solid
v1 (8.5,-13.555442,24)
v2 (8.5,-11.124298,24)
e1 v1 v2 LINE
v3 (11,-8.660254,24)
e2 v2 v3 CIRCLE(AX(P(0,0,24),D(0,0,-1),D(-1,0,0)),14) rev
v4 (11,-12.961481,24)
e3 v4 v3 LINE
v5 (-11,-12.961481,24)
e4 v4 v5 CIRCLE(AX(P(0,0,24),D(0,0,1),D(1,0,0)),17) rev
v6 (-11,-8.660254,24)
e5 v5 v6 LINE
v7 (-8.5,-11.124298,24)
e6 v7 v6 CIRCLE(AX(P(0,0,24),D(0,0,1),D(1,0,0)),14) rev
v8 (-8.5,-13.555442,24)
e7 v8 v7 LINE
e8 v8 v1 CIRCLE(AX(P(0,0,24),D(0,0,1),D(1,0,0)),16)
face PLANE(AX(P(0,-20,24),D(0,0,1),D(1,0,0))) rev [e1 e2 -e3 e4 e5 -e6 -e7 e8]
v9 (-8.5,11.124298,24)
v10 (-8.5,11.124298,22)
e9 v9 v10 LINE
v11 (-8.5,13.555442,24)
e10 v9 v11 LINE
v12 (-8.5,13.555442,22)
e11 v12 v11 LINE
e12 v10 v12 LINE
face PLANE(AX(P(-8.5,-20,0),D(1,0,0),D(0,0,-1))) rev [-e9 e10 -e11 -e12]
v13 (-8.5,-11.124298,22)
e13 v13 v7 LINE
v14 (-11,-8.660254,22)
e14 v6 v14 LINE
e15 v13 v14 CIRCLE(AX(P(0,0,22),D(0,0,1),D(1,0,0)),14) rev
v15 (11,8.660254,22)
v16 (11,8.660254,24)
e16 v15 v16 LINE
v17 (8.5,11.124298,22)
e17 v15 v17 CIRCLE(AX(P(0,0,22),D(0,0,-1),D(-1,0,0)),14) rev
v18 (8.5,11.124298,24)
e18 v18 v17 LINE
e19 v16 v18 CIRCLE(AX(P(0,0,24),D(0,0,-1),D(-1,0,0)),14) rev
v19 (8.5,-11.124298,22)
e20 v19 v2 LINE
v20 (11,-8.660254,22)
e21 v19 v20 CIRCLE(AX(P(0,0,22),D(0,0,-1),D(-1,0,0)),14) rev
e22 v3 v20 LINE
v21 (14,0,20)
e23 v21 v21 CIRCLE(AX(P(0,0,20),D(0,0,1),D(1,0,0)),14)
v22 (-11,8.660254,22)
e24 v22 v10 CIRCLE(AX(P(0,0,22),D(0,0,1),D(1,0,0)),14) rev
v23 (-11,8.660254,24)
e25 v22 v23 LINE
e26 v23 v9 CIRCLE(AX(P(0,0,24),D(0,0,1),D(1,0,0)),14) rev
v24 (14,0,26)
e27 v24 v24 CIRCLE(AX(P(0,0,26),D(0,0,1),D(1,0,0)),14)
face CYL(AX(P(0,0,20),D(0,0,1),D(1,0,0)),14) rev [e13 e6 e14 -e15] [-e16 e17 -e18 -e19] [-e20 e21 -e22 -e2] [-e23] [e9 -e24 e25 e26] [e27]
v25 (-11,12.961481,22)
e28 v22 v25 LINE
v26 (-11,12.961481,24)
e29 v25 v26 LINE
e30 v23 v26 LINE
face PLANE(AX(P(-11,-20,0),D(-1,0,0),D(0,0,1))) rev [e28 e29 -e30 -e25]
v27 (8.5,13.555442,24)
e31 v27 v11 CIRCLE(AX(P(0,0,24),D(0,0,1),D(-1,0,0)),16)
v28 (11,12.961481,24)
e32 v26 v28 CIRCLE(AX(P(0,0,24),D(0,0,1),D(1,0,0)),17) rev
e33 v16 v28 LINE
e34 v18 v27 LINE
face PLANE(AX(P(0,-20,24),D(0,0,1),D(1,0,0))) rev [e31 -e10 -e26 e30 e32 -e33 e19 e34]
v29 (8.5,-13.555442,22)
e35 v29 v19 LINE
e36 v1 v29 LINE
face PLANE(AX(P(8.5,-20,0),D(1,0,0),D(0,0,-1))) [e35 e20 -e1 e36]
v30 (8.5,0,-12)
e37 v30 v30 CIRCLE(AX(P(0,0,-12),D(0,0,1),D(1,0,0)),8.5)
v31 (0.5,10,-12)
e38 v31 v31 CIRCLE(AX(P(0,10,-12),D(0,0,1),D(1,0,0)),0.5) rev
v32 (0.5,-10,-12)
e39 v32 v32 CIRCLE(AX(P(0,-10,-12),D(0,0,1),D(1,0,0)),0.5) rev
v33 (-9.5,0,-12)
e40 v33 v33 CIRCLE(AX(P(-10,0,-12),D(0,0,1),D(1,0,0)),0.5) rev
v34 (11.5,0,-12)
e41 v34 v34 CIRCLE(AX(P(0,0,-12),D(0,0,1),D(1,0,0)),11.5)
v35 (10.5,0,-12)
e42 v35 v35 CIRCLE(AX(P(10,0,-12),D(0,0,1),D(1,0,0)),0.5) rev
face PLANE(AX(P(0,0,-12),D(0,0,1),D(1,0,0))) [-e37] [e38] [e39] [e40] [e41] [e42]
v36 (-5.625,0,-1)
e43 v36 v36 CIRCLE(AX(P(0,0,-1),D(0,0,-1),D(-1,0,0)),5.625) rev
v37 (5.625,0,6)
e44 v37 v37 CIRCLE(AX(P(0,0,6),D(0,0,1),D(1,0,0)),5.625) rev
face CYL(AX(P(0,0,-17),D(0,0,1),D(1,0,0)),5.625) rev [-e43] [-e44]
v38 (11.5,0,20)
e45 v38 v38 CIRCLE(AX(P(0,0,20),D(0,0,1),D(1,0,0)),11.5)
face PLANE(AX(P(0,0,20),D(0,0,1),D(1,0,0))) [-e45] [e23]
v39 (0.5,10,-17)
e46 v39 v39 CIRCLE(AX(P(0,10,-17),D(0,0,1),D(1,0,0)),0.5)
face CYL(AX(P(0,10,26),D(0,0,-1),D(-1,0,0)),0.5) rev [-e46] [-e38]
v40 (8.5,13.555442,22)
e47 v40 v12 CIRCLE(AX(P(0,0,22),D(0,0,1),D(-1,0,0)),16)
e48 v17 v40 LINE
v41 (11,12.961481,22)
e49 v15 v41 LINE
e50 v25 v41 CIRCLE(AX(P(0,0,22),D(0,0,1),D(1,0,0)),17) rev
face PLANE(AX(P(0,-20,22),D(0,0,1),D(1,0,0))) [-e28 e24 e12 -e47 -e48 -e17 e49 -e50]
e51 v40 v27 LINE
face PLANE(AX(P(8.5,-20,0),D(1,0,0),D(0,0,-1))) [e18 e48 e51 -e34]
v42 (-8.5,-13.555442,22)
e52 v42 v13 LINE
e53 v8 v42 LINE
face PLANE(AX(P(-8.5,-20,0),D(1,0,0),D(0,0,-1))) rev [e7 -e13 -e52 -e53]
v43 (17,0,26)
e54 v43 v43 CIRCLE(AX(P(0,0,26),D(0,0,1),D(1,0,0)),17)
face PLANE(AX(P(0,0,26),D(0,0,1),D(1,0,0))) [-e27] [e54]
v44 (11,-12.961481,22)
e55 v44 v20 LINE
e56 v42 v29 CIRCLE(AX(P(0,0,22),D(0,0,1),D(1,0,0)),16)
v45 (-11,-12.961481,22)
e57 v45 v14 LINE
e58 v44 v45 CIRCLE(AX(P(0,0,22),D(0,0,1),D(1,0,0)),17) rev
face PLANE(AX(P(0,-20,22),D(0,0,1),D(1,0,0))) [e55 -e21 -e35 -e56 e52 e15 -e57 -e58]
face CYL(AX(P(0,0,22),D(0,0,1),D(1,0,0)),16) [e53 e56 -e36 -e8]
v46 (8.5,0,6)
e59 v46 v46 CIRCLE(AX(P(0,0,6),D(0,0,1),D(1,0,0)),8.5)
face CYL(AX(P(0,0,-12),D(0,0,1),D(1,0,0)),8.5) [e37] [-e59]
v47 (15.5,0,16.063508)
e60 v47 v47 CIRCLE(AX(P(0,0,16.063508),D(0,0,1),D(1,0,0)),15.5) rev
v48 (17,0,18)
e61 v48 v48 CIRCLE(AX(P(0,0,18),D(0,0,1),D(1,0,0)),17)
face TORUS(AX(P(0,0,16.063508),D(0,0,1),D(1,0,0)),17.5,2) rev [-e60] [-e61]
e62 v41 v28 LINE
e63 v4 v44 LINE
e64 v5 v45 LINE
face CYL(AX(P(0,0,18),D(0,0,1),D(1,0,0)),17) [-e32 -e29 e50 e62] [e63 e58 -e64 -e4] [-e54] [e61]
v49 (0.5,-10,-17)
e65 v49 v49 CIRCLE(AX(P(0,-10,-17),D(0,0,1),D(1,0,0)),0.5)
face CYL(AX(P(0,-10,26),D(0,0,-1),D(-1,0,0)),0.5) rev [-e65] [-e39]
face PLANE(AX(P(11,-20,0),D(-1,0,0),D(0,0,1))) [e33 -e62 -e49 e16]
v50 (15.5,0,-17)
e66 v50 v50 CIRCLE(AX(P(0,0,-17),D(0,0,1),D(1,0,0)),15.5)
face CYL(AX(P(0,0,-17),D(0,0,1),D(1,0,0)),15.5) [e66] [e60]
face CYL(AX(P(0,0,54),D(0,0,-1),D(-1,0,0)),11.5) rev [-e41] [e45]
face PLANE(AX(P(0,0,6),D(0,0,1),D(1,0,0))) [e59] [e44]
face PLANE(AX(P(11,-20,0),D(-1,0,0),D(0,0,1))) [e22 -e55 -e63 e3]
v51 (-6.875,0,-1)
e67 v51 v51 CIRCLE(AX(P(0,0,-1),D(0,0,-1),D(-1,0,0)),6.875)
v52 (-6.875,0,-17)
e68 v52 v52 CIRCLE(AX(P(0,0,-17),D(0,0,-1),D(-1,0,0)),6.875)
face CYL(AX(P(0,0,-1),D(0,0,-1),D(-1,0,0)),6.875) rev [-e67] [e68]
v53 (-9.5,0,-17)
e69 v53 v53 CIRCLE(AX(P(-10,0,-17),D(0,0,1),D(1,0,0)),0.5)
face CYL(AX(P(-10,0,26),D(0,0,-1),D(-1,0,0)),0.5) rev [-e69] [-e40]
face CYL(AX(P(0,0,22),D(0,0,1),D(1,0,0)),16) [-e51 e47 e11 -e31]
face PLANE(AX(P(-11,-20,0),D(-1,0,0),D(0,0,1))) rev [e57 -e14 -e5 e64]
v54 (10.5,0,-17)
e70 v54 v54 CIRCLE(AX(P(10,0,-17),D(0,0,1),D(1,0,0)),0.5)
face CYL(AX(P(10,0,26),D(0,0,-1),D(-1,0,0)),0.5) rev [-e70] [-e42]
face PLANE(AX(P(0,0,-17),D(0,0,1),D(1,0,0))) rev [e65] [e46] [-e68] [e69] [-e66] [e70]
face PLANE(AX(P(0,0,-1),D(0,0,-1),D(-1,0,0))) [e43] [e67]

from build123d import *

# Parameters (mm, degrees)
BOSS_EXTRUDE5_DEPTH      = 26
BOSS_EXTRUDE5_DEPTH_BACK = 17
SKETCH1_R                = 15.5
SKETCH3_R                = 5.625
CUT_EXTRUDE2_DEPTH       = 49.264894074
CUT_EXTRUDE3_DEPTH       = 28
CUT_EXTRUDE3_DEPTH_BACK  = 20
SKETCH4_R                = 11.5
CUT_EXTRUDE6_START       = 6
SKETCH7_R                = 11.5
SKETCH7_R_2              = 8.5
CUT_EXTRUDE6_DEPTH       = 18
BOSS_EXTRUDE8_DEPTH      = 6
BOSS_EXTRUDE8_DEPTH_BACK = 2
BOSS_EXTRUDE8_START      = 20
SKETCH12_R               = 17
CUT_EXTRUDE10_START      = 18
SKETCH13_R               = 11.5
CUT_EXTRUDE10_DEPTH      = 18.411862419
FILLET2_R                = 2
CUT_EXTRUDE11_START      = 26
SKETCH14_R               = 14
CUT_EXTRUDE11_DEPTH      = 6
CUT_EXTRUDE14_DEPTH      = 36.411862419
CUT_EXTRUDE14_DEPTH_BACK = 36.411862419
SKETCH15_R               = 0.5
SKETCH18_W               = 2.5
SKETCH18_H               = 2
CUT_EXTRUDE15_DEPTH      = 20
CUT_EXTRUDE16_DEPTH      = 2
SKETCH28_R               = 6.875
CUT_EXTRUDE17_DEPTH      = 16


with BuildPart() as part:
    # Sketch1 → Boss-Extrude5 (new, two sides: drawn at the far end of the back side and taken through both)
    with BuildSketch(Plane.XY.offset(-BOSS_EXTRUDE5_DEPTH_BACK)):
        Circle(SKETCH1_R)
    extrude(amount=BOSS_EXTRUDE5_DEPTH + BOSS_EXTRUDE5_DEPTH_BACK)

    # Sketch3 → Cut-Extrude2 (cut, through all)
    with BuildSketch(Plane.XY.offset(26)):
        Circle(SKETCH3_R)
    extrude(amount=-CUT_EXTRUDE2_DEPTH, mode=Mode.SUBTRACT)

    # Sketch4 → Cut-Extrude3 (cut, two sides: drawn at the far end of the back side and taken through both)
    with BuildSketch(Plane.XY.offset(26).offset(-CUT_EXTRUDE3_DEPTH_BACK)):
        Circle(SKETCH4_R)
    extrude(amount=CUT_EXTRUDE3_DEPTH + CUT_EXTRUDE3_DEPTH_BACK, mode=Mode.SUBTRACT)

    # Sketch7 → Cut-Extrude6 (cut)
    with BuildSketch(Plane.XY.offset(CUT_EXTRUDE6_START)):
        Circle(SKETCH7_R)
        Circle(SKETCH7_R_2, mode=Mode.SUBTRACT)
    extrude(amount=-CUT_EXTRUDE6_DEPTH, mode=Mode.SUBTRACT)

    # Sketch12 → Boss-Extrude8 (add, two sides: drawn at the far end of the back side and taken through both)
    with BuildSketch(Plane.XY.offset(BOSS_EXTRUDE8_START - BOSS_EXTRUDE8_DEPTH_BACK)):
        Circle(SKETCH12_R)
    extrude(amount=BOSS_EXTRUDE8_DEPTH + BOSS_EXTRUDE8_DEPTH_BACK)

    # Sketch13 → Cut-Extrude10 (cut, through all)
    with BuildSketch(Plane.XY.offset(CUT_EXTRUDE10_START)):
        Circle(SKETCH13_R)
    extrude(amount=CUT_EXTRUDE10_DEPTH, mode=Mode.SUBTRACT)

    # Fillet2
    # the kernel refuses this fillet: 2 mm, written as the material it adds along each edge
    with BuildSketch(Plane(origin=(0, 0, 18), x_dir=(1, 0, 0), z_dir=(0, 1, 0))) as fillet2_piece_1:
        with BuildLine():
            CenterArc((17.5, 1.936491673), FILLET2_R, 180, 75.522487814)
            Line((17, 0), (16.99, -0.038729833))
            ThreePointArc((16.99, -0.038729833), (16.25, -0.04), (15.5, -0.04))
            Line((15.5, -0.04), (15.46, 0))
            Line((15.46, 0), (15.46, 1.936491673))
            Line((15.46, 1.936491673), (15.5, 1.936491673))
        make_face()
    revolve(axis=Axis((0, 0, 18), (0, 0, -1)))

    # Sketch14 → Cut-Extrude11 (cut)
    with BuildSketch(Plane.XY.offset(CUT_EXTRUDE11_START)):
        Circle(SKETCH14_R)
    extrude(amount=-CUT_EXTRUDE11_DEPTH, mode=Mode.SUBTRACT)

    # Sketch15 → Cut-Extrude14 (cut, two sides: drawn at the far end of the back side and taken through both)
    with BuildSketch(Plane.XY.offset(-CUT_EXTRUDE14_DEPTH_BACK)):
        with Locations((0, 10)):
            Circle(SKETCH15_R)
        with Locations((0, -10)):
            Circle(SKETCH15_R)
        with Locations((10, 0)):
            Circle(SKETCH15_R)
        with Locations((-10, 0)):
            Circle(SKETCH15_R)
    extrude(amount=CUT_EXTRUDE14_DEPTH + CUT_EXTRUDE14_DEPTH_BACK, mode=Mode.SUBTRACT)

    # Sketch18 → Cut-Extrude15 (cut, symmetric)
    with BuildSketch(Plane(origin=(0, 0, 0), x_dir=(1, 0, 0), z_dir=(0, 1, 0))):
        with Locations((-9.75, -23)):
            Rectangle(SKETCH18_W, SKETCH18_H)
        with Locations((9.75, -23)):
            Rectangle(SKETCH18_W, SKETCH18_H)
    extrude(amount=CUT_EXTRUDE15_DEPTH, both=True, mode=Mode.SUBTRACT)

    # Sketch23 → Cut-Extrude16 (cut)
    with BuildSketch(Plane(origin=(0, 0, 24), x_dir=(-1, 0, 0), z_dir=(0, 0, -1))):
        with BuildLine():
            Line((9.719197711, 13.947659153), (9.147480199, 13.127208615))
            ThreePointArc((9.147480199, 13.127208615), (0, 16), (-9.147480199, 13.127208615))
            Line((-9.147480199, 13.127208615), (-9.719197711, 13.947659153))
            ThreePointArc((-9.719197711, 13.947659153), (0, 17), (9.719197711, 13.947659153))
        make_face()
        with BuildLine():
            Line((-9.147480199, -13.127208615), (-9.719197711, -13.947659153))
            ThreePointArc((-9.719197711, -13.947659153), (0, -17), (9.719197711, -13.947659153))
            Line((9.719197711, -13.947659153), (9.147480199, -13.127208615))
            ThreePointArc((9.147480199, -13.127208615), (0, -16), (-9.147480199, -13.127208615))
        make_face()
    extrude(amount=CUT_EXTRUDE16_DEPTH, mode=Mode.SUBTRACT)

    # Sketch28 → Cut-Extrude17 (cut)
    with BuildSketch(Plane(origin=(0, 0, -17), x_dir=(-1, 0, 0), z_dir=(0, 0, -1))):
        Circle(SKETCH28_R)
    extrude(amount=-CUT_EXTRUDE17_DEPTH, mode=Mode.SUBTRACT)


solid = part.part
